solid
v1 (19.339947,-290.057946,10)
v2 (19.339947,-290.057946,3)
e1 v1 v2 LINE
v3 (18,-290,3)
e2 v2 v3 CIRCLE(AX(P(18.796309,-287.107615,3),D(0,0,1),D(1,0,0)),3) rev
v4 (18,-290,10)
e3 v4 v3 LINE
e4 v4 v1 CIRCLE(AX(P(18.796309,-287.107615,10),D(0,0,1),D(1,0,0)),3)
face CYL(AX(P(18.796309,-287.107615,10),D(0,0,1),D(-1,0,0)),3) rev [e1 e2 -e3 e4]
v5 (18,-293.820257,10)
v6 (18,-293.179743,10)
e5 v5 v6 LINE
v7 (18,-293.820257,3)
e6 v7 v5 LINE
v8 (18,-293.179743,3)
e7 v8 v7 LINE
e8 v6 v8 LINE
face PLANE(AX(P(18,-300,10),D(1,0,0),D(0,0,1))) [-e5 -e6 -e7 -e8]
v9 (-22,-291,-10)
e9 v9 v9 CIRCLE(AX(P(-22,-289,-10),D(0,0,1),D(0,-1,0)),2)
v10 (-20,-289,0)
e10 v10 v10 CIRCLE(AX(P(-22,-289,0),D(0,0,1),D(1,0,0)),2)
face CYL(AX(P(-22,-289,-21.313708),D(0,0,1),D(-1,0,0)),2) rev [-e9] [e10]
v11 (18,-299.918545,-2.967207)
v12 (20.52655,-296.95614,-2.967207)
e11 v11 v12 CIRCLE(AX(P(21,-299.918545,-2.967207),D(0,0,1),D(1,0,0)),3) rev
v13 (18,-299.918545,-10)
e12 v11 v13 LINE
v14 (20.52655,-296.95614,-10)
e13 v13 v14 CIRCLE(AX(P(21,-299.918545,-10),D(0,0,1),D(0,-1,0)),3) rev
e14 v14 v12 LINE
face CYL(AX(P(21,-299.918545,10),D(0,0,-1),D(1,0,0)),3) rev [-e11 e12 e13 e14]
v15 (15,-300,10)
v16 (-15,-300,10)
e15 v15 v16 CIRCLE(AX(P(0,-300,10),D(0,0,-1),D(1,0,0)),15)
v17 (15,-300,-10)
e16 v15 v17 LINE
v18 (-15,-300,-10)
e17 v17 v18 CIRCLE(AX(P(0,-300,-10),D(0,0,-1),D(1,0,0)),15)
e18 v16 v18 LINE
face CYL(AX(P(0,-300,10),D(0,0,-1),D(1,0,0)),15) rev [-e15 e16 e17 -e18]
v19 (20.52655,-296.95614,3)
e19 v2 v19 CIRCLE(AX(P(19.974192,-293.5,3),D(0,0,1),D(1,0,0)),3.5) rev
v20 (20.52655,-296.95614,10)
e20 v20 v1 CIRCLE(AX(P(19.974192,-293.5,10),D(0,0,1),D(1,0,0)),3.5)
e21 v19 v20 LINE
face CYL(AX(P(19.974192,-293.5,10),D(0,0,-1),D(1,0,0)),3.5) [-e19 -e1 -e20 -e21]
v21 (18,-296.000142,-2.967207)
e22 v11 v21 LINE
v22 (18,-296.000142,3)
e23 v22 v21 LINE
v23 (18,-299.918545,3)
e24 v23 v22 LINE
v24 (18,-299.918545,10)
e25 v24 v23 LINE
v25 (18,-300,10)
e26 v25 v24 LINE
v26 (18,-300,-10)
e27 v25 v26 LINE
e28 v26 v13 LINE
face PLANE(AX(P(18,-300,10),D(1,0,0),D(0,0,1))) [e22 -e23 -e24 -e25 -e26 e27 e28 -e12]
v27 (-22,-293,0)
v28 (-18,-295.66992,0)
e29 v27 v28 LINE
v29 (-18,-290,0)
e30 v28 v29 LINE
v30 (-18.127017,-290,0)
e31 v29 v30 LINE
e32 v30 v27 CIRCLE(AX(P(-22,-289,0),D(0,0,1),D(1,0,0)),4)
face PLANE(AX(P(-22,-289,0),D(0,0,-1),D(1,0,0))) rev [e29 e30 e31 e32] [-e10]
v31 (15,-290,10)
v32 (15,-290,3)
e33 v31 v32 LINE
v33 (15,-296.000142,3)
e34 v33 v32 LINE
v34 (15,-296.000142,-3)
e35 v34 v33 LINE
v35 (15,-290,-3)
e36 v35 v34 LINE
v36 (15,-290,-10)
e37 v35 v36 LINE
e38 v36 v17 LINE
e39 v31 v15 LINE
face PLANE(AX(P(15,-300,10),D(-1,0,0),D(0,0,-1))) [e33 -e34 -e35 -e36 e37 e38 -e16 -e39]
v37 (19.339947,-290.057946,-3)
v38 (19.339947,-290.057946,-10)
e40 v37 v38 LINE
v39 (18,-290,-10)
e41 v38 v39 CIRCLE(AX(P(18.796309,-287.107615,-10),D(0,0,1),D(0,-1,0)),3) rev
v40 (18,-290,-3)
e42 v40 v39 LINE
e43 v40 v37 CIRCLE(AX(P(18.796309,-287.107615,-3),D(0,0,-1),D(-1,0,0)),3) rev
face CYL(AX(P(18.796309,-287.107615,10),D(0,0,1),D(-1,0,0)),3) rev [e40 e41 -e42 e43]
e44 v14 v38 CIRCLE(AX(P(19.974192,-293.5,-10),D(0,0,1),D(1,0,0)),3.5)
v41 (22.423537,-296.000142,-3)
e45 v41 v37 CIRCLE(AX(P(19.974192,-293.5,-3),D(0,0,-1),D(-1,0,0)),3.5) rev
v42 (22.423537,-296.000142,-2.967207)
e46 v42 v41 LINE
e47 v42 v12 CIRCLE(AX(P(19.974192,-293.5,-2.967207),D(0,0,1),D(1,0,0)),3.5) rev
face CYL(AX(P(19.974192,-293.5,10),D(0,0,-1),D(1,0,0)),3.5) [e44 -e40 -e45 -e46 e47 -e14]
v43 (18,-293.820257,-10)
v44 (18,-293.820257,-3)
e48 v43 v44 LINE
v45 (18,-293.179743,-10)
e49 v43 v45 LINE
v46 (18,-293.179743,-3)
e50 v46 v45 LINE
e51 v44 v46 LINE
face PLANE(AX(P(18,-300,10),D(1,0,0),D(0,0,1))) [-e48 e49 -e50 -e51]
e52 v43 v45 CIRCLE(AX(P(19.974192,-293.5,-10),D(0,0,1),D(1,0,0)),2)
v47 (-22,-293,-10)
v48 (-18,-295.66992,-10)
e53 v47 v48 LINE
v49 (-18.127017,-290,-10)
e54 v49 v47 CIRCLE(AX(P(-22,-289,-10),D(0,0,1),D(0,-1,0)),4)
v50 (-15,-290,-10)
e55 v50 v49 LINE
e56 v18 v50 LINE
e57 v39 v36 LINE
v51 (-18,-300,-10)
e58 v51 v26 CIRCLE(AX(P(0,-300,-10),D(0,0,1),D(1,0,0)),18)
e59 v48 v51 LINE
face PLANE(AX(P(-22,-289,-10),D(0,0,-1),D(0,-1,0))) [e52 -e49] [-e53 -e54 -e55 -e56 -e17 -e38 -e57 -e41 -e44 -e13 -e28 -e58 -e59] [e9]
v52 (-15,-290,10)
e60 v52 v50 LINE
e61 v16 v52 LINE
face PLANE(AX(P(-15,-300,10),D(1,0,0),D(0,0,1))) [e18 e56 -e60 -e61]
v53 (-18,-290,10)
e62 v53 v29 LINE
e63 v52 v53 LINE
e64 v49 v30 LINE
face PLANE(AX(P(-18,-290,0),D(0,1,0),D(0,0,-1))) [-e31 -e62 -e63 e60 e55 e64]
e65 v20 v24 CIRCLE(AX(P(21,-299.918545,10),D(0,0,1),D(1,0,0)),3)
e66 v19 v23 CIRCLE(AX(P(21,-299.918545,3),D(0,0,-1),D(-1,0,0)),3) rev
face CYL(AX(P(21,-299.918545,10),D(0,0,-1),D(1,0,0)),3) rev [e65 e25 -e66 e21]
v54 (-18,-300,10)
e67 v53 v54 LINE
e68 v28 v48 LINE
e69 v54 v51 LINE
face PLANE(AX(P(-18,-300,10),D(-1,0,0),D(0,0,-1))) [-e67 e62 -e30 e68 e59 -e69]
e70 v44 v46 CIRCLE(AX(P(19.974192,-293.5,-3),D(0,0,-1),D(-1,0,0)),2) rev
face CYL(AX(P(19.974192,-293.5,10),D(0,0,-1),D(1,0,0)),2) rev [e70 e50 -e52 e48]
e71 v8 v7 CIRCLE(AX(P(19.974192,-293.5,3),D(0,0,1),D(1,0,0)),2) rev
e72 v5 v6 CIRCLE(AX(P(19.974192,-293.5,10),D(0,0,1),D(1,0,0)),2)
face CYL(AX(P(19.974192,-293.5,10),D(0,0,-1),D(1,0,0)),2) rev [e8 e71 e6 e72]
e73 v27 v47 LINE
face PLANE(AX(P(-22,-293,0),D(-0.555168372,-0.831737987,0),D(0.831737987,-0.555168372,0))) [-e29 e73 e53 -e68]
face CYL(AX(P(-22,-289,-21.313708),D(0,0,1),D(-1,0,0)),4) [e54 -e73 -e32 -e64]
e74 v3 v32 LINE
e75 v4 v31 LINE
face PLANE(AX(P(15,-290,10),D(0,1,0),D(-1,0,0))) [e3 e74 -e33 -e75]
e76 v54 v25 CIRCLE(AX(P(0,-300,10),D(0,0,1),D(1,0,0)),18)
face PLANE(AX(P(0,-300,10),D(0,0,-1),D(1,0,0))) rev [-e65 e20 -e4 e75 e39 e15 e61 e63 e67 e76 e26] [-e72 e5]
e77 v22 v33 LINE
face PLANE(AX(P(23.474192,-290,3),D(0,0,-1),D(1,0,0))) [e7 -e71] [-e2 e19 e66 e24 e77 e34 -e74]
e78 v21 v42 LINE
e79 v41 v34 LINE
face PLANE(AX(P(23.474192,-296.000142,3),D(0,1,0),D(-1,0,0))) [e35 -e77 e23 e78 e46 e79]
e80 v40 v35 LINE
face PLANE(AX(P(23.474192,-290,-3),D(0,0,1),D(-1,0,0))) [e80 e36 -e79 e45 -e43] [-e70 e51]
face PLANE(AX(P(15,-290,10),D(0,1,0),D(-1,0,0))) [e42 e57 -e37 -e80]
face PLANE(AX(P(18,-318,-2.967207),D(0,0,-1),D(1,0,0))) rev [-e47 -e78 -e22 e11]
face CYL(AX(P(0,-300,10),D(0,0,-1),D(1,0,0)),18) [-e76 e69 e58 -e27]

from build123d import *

# Parameters (mm, degrees)
SKETCH1_R                           = 4
SKETCH1_R_2                         = 2
BOSS_EXTRUDE1_DEPTH                 = 10
BOSS_EXTRUDE2_DEPTH                 = 20
BOSS_EXTRUDE3_DEPTH                 = 10
SKETCH5_R                           = 3.5
SKETCH5_R_2                         = 2
BOSS_EXTRUDE4_DEPTH                 = 20
SKETCH4_W                           = 6
SKETCH4_H                           = 6.000142194
CUT_EXTRUDE1_DEPTH                  = 3
CUT_EXTRUDE1_DIRECTION_2_REACH      = 323.185
CUT_EXTRUDE1_DIRECTION_2_END_RADIUS = 3.5
FILLET2_R                           = 3
SKETCH6_W                           = 4.423537042
SKETCH6_H                           = 5.967206981
CUT_EXTRUDE2_DEPTH                  = 36.49639057
BODY_MOVE_COPY1_OUTLINE_R           = 2
BODY_MOVE_COPY1_DEPTH               = 10
BODY_MOVE_COPY1_START               = 2.967206981
BODY_MOVE_COPY1_2_DEPTH             = 0.032793019
BODY_MOVE_COPY1_START_2             = -10
BODY_MOVE_COPY1_3_OUTLINE_R         = 2
BODY_MOVE_COPY1_3_DEPTH             = 10
BODY_MOVE_COPY1_START_3             = -3
BODY_MOVE_COPY1_4_DEPTH             = 0.032793019


# Read off the part's stored shape, not the designer's step: Body-Move/Copy1
with BuildPart() as part:
    # Sketch1 → Boss-Extrude1 (new body)
    with BuildSketch(Plane.XY):
        with Locations(Location((-22, -289, 0), (0, 0, 270))):
            Circle(SKETCH1_R)
        with Locations(Location((-22, -289, 0), (0, 0, 270))):
            Circle(SKETCH1_R_2, mode=Mode.SUBTRACT)
    extrude(amount=BOSS_EXTRUDE1_DEPTH)



with BuildPart() as body_2:
    # Sketch2 → Boss-Extrude2 (new body)
    with BuildSketch(Plane.XY.offset(10)):
        with BuildLine():
            Line((-18, -300), (-18, -295.71047836))
            Line((-18, -295.71047836), (-18, -290))
            Line((-18, -290), (-15, -290))
            Line((-15, -290), (-15, -300))
            ThreePointArc((-15, -300), (0, -315), (15, -300))
            Line((15, -300), (15, -290))
            Line((15, -290), (18, -290))
            Line((18, -290), (18, -300))
            ThreePointArc((18, -300), (0, -318), (-18, -300))
        make_face()
    extrude(amount=-BOSS_EXTRUDE2_DEPTH)


with BuildPart() as part_1:
    add(part.part)

    add(body_2.part)  # Boss-Extrude3 merges body 2
    # Sketch3 → Boss-Extrude3 (add)
    with BuildSketch(Plane.XY.offset(10)):
        Polygon((-18, -290), (-18.290403154, -290), (-22, -293), (-18, -295.669919522), align=None)
    extrude(amount=-BOSS_EXTRUDE3_DEPTH)

    # Sketch5 → Boss-Extrude4 (add)
    with BuildSketch(Plane.XY.offset(10)):
        with Locations((19.974192434, -293.5)):
            Circle(SKETCH5_R)
        with Locations((19.974192434, -293.5)):
            Circle(SKETCH5_R_2, mode=Mode.SUBTRACT)
    extrude(amount=-BOSS_EXTRUDE4_DEPTH)

    # Sketch4 → Cut-Extrude1 (cut)
    with BuildSketch(Plane(origin=(18, 0, 0), x_dir=(0, 0, -1), z_dir=(1, 0, 0))):
        with Locations((0, -293.000071097)):
            Rectangle(SKETCH4_W, SKETCH4_H)
    extrude(amount=-CUT_EXTRUDE1_DEPTH, mode=Mode.SUBTRACT)

    # Cut-Extrude1 direction 2: up to this cylinder (the profile starts inside it)
    cut_extrude1_direction_2_end = Plane(origin=(19.974192434, -293.5, 0), z_dir=(0, 0, 1)) * Cylinder(CUT_EXTRUDE1_DIRECTION_2_END_RADIUS, 654.37, mode=Mode.PRIVATE)
    # Sketch4 → Cut-Extrude1 direction 2 (cut, up to the surface)
    with BuildSketch(Plane(origin=(18, 0, 0), x_dir=(0, 0, -1), z_dir=(1, 0, 0)), mode=Mode.PRIVATE) as cut_extrude1_direction_2_sk1:
        with Locations((0, -293.000071097)):
            Rectangle(SKETCH4_W, SKETCH4_H)
    cut_extrude1_direction_2_tool1 = extrude(cut_extrude1_direction_2_sk1.sketch, amount=CUT_EXTRUDE1_DIRECTION_2_REACH, mode=Mode.PRIVATE) & cut_extrude1_direction_2_end
    add(cut_extrude1_direction_2_tool1.solids().sort_by_distance((18, -293.000071, 0))[0], mode=Mode.SUBTRACT)

    # Fillet2
    # the kernel refuses this fillet: 3 mm, written as the material it adds along each edge
    with BuildSketch(Plane(origin=(18, -290.609919684, -10), x_dir=(1.5610699103436222e-12, 1.0, 0), z_dir=(0, 0, 1)), Plane(origin=(18, -290.609919684, 3), x_dir=(1.5610699103436222e-12, 1.0, 0), z_dir=(0, 0, 1))) as fillet2_piece_1:
        with BuildLine():
            CenterArc((3.502304969, -0.796308584), FILLET2_R, 164.60712684, 25.833288924)
            Line((0.551973299, -1.339947284), (0.492966665, -1.350820058))
            ThreePointArc((0.492966665, -1.350820058), (0.29061984, -0.663945695), (-0.049544234, -0.033843299))
            Line((-0.049544234, -0.033843299), (0, 0.06))
            ThreePointArc((0, 0.06), (0.304959842, 0.06), (0.552071978, 0.015926172))
            Line((0.552071978, 0.015926172), (0.609919684, 0))
        make_face()
    extrude(amount=7)
    with BuildSketch(Plane(origin=(18, -296.390080316, -10), x_dir=(0.975809068162025, -0.21862447825611958, 0), z_dir=(0, 0, 1))) as fillet2_piece_2:
        with BuildLine():
            CenterArc((3.698835937, -2.787234318), FILLET2_R, 111.708438384, 80.919816446)
            Line((0.771408732, -3.443107753), (0.712860188, -3.456225222))
            Line((0.712860188, -3.456225222), (-0.058548544, -0.013117469))
            Line((-0.058548544, -0.013117469), (0.022193016, 0.055744686))
            ThreePointArc((0.022193016, 0.055744686), (1.294592578, -0.188226629), (2.56699214, 0.055744686))
            Line((2.56699214, 0.055744686), (2.589185156, 0))
        make_face()
    extrude(amount=20)

    # Sketch6 → Cut-Extrude2 (cut, through all)
    with BuildSketch(Plane(origin=(0, -296.000142194, 0), x_dir=(1, 0, 0), z_dir=(0, 1, 0))):
        with Locations((20.211768521, 0.016396509)):
            Rectangle(SKETCH6_W, SKETCH6_H)
    extrude(amount=-CUT_EXTRUDE2_DEPTH, mode=Mode.SUBTRACT)

    # Body-Move/Copy1 outline → Body-Move/Copy1 (cut)
    with BuildSketch(Plane.XY):
        with BuildLine():
            Line((-18, -290), (-18.127016654, -290))
            ThreePointArc((-18.127016654, -290), (-24.449489743, -285.83772234), (-22, -293))
            Line((-22, -293), (-18, -295.669919522))
            Line((-18, -295.669919522), (-18, -290))
        make_face()
        with Locations((-22, -289)):
            Circle(BODY_MOVE_COPY1_OUTLINE_R, mode=Mode.SUBTRACT)
    extrude(amount=BODY_MOVE_COPY1_DEPTH, mode=Mode.SUBTRACT)

    # Body-Move_Copy1 2 outline → Body-Move_Copy1 2 (cut)
    with BuildSketch(Plane.XY.offset(BODY_MOVE_COPY1_START)):
        with BuildLine():
            ThreePointArc((20.526550354, -296.95613957), (21.549323306, -296.625533992), (22.423537042, -296.000142194))
            Line((22.423537042, -296.000142194), (18, -296.000142194))
            Line((18, -296.000142194), (18, -299.918544916))
            ThreePointArc((18, -299.918544916), (18.71741934, -297.971797492), (20.526550354, -296.95613957))
        make_face()
    extrude(amount=BODY_MOVE_COPY1_2_DEPTH, mode=Mode.SUBTRACT)

    # Body-Move_Copy1 3 outline → Body-Move_Copy1 3 (add)
    with BuildSketch(Plane.XY.offset(BODY_MOVE_COPY1_START_2)):
        with BuildLine():
            Line((-18, -290), (-18.127016654, -290))
            ThreePointArc((-18.127016654, -290), (-24.449489743, -285.83772234), (-22, -293))
            Line((-22, -293), (-18, -295.669919522))
            Line((-18, -295.669919522), (-18, -290))
        make_face()
        with Locations((-22, -289)):
            Circle(BODY_MOVE_COPY1_3_OUTLINE_R, mode=Mode.SUBTRACT)
    extrude(amount=BODY_MOVE_COPY1_3_DEPTH)

    # Body-Move_Copy1 4 outline → Body-Move_Copy1 4 (add)
    with BuildSketch(Plane.XY.offset(BODY_MOVE_COPY1_START_3)):
        with BuildLine():
            ThreePointArc((20.526550354, -296.95613957), (21.549323306, -296.625533992), (22.423537042, -296.000142194))
            Line((22.423537042, -296.000142194), (18, -296.000142194))
            Line((18, -296.000142194), (18, -299.918544916))
            ThreePointArc((18, -299.918544916), (18.71741934, -297.971797492), (20.526550354, -296.95613957))
        make_face()
    extrude(amount=BODY_MOVE_COPY1_4_DEPTH)


solid = part_1.part
